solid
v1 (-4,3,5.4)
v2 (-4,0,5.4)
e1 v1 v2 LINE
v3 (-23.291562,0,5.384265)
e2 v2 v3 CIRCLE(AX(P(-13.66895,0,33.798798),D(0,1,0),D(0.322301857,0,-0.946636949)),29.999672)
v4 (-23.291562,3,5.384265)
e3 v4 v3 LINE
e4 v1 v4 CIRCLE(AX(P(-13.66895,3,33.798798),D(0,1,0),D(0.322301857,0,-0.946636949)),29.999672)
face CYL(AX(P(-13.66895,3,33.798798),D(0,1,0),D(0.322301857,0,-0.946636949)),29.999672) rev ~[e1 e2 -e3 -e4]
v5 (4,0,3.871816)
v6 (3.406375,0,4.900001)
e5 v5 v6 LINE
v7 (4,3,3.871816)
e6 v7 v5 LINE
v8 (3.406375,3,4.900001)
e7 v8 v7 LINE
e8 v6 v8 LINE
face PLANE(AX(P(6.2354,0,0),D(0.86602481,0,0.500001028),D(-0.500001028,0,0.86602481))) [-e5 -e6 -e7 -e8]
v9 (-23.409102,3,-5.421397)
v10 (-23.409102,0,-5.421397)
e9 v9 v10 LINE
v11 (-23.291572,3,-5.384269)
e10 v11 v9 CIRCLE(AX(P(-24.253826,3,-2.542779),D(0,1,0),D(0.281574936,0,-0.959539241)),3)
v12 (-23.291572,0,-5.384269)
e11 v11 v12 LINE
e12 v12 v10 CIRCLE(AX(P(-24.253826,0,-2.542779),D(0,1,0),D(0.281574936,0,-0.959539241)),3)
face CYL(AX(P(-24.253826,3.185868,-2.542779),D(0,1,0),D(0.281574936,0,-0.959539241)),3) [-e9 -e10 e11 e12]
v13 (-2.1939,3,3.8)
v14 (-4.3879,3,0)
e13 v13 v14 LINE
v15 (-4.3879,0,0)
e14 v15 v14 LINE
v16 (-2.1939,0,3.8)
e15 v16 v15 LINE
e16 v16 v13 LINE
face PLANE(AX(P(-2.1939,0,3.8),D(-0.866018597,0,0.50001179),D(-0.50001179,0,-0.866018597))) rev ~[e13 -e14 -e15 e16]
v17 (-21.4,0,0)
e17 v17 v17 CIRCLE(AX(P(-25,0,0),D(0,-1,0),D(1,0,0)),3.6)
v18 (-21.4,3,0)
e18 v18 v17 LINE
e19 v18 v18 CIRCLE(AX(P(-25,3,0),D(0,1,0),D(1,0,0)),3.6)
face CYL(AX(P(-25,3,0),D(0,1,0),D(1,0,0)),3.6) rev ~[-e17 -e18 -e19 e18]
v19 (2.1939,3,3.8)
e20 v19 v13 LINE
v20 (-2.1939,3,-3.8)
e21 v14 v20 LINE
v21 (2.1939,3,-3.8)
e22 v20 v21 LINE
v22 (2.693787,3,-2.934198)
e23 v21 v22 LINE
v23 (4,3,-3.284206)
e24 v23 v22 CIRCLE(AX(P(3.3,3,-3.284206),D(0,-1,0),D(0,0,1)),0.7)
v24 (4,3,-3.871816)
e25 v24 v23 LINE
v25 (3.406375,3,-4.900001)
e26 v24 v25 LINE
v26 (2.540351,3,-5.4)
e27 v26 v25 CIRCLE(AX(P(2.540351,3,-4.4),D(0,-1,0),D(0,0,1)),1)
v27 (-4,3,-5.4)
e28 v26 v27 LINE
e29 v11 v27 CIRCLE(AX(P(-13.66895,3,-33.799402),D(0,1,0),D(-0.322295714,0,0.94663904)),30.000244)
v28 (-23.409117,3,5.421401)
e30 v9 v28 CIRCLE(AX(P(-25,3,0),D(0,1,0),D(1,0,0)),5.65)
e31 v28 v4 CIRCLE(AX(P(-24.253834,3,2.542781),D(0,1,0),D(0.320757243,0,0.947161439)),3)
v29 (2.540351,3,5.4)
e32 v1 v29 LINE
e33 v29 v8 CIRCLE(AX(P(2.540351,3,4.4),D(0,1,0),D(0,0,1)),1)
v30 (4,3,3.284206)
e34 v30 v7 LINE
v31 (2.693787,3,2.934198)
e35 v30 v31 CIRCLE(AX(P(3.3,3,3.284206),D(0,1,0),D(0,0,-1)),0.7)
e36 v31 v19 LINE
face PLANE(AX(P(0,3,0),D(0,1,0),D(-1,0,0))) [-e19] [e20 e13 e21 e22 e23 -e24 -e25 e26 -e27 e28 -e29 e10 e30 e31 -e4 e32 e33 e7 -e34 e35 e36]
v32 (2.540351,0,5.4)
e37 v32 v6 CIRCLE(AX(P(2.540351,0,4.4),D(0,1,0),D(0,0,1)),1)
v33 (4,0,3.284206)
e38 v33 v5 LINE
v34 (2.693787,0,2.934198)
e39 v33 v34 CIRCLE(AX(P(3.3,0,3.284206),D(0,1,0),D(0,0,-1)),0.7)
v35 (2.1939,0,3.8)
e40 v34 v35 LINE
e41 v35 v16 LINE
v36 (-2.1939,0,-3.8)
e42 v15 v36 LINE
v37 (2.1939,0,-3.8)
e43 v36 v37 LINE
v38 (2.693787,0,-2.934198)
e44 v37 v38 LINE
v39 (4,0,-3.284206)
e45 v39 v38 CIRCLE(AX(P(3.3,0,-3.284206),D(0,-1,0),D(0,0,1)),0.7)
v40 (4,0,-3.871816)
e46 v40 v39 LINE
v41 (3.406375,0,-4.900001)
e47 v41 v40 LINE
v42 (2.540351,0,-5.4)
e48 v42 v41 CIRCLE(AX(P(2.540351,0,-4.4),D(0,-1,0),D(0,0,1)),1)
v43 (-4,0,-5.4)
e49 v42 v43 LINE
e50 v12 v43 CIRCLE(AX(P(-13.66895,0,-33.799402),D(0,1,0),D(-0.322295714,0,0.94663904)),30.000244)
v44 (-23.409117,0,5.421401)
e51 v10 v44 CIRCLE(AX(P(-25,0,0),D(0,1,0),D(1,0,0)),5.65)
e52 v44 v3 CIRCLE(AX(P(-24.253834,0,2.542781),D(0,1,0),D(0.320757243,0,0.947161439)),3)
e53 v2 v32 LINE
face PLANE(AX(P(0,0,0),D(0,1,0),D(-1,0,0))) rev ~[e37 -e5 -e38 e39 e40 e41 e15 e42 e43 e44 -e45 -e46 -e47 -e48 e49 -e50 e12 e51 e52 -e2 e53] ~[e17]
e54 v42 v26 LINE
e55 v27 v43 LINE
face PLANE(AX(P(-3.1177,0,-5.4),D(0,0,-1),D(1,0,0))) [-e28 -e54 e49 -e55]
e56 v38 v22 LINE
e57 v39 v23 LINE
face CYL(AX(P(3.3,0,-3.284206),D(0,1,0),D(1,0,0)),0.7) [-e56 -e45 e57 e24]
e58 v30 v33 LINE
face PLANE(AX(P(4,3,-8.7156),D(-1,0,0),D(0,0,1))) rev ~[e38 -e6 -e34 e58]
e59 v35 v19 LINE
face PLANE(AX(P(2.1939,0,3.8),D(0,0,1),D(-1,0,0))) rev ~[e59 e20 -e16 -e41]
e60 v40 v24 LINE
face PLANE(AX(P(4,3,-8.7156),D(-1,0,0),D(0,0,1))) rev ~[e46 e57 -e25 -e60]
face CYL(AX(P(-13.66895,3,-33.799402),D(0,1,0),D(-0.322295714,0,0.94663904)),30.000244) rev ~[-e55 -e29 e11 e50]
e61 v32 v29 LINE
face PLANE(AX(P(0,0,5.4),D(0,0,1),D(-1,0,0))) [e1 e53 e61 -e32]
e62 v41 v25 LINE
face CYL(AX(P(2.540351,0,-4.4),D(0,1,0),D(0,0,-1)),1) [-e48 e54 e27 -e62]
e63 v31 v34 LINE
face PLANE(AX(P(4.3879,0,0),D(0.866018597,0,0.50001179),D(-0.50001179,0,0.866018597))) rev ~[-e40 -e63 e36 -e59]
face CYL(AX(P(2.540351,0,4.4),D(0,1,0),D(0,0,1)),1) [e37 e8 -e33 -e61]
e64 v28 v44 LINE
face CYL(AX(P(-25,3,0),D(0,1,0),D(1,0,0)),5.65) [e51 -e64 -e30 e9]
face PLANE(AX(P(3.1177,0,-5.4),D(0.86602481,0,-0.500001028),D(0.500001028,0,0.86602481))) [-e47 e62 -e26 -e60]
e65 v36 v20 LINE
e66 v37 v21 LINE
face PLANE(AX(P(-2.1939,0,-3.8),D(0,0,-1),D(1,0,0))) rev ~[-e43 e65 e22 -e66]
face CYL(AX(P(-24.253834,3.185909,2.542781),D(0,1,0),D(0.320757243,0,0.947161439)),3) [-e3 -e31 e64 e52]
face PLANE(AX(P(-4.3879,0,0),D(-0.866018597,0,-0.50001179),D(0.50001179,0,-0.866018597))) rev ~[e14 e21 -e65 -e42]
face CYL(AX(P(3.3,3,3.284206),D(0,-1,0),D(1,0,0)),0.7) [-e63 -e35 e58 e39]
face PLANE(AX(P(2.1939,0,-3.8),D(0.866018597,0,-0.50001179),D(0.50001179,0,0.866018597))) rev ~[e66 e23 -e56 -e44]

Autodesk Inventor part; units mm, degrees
ref_plane "YZ Plane" through (0, 0, 0) normal (1, 0, 0) x (0, 1, 0)
ref_plane "XZ Plane" through (0, 0, 0) normal (0, 1, 0) x (-1, 0, 0)
ref_plane "XY Plane" through (0, 0, 0) normal (0, 0, 1) x (1, 0, 0)
sketch "Boceto1" plane through (0, 0, 0) normal (0, 1, 0) x (-1, 0, 0)
  line L0 (6.2354, 0) -> (3.1177, -5.4)
  line L1 (3.1177, -5.4) -> (-3.1177, -5.4)
  line L2 (-3.1177, -5.4) -> (-6.2354, 0)
  line L3 (-6.2354, 0) -> (-3.1177, 5.4)
  line L4 (-3.1177, 5.4) -> (3.1177, 5.4)
  line L5 (3.1177, 5.4) -> (6.2354, 0)
  circle A0 centre (0, 0) radius 5.4
  line L6 (4.3879, 0) -> (2.1939, -3.8)
  line L7 (2.1939, -3.8) -> (-2.1939, -3.8)
  line L8 (-2.1939, -3.8) -> (-4.3879, 0)
  line L9 (-4.3879, 0) -> (-2.1939, 3.8)
  line L10 (-2.1939, 3.8) -> (2.1939, 3.8)
  line L11 (2.1939, 3.8) -> (4.3879, 0)
  dimension "d0" = 10.8
  dimension "d4" = 1.6
extrude "Extrusión1" add sketch "Boceto1" along normal blind 3
sketch "Boceto2" plane through (0, 3, 0) normal (0, 1, 0) x (1, 0, 0)
  line L0 (8.9124, 8.7156) -> (4, 8.7156)
  line L1 (4, 8.7156) -> (4, -10.3861)
  line L2 (4, -10.3861) -> (8.9124, -10.3861)
  line L3 (8.9124, -10.3861) -> (8.9124, 8.7156)
  point P0 (0, 0)
  dimension "d22" = 4
extrude "Extrusión2" cut sketch "Boceto2" against normal through all
fillet "Empalme1" radius 1 4 edges at (3.1177, 1.5, -5.4) (3.1177, 1.5, 5.4) (-3.1177, 1.5, 5.4) (-3.1177, 1.5, -5.4)
fillet "Empalme2" radius 0.7 2 edges at (4, 1.5, -0.6718) (4, 1.5, 0.6718)
sketch "Boceto3" plane through (0, 3, 0) normal (0, 1, 0) x (1, 0, 0)
  line L0 (-23.3379, 5.4) -> (-4.3879, 5.4)
  line L1 (-4.3879, 5.4) -> (-4.3879, -5.4)
  line L2 (-4.3879, -5.4) -> (-23.3379, -5.4)
  line L3 (-23.3379, -5.4) -> (-23.3379, 5.4)
  line L4 (-23.3379, 5.4) -> (-4.3879, -5.4) construction
  line L5 (-4.3879, 5.4) -> (-23.3379, -5.4) construction
  line L6 (2.6938, -2.9342) -> (2.1939, -3.8) projected
  line L7 (2.1939, -3.8) -> (-2.1939, -3.8) projected
  line L8 (-2.1939, -3.8) -> (-4.3879, 0) projected
  line L9 (-4.3879, 0) -> (-2.1939, 3.8) projected
  line L10 (-2.1939, 3.8) -> (2.1939, 3.8) projected
  line L11 (2.1939, 3.8) -> (2.6938, 2.9342) projected
  arc A0 (3.4064, 4.9) -> (2.5403, 5.4) centre (2.5403, 4.4) ccw projected
  line L12 (2.5403, 5.4) -> (-2.5403, 5.4) projected
  arc A1 (-2.5403, 5.4) -> (-3.4064, 4.9) centre (-2.5403, 4.4) ccw projected
  line L13 (-3.4064, 4.9) -> (-6.2354, 0) projected
  line L14 (-6.2354, 0) -> (-3.4064, -4.9) projected
  arc A2 (-3.4064, -4.9) -> (-2.5403, -5.4) centre (-2.5403, -4.4) ccw projected
  line L15 (-2.5403, -5.4) -> (2.5403, -5.4) projected
  arc A3 (2.5403, -5.4) -> (3.4064, -4.9) centre (2.5403, -4.4) ccw projected
  line L16 (-4.3879, 5.4) -> (-0.8083, 5.4)
  line L17 (-0.8083, 5.4) -> (-0.8083, -5.4)
  line L18 (-0.8083, -5.4) -> (-4.3879, -5.4)
  line L19 (-4.3879, -5.4) -> (-4.3879, 5.4)
  circle A4 centre (-25, 0) radius 3.6
  circle A5 centre (-25, 0) radius 5.65
  line L20 (3.4064, -4.9) -> (4, -3.8718) projected
  line L21 (4, 3.8718) -> (3.4064, 4.9) projected
  line L22 (4, -3.8718) -> (4, -3.2842) projected
  line L23 (4, 3.2842) -> (4, 3.8718) projected
  arc A6 (4, -3.2842) -> (2.6938, -2.9342) centre (3.3, -3.2842) ccw projected
  arc A7 (2.6938, 2.9342) -> (4, 3.2842) centre (3.3, 3.2842) ccw projected
  point P0 (0, 0)
  point P1 (-13.8629, 0)
  point P2 (-13.8629, 0)
  point P3 (-13.8629, 0)
  point P4 (-2.5403, -5.4)
  point P5 (-2.5403, 5.4)
  point P6 (-23.3379, 5.4)
  point P7 (-2.8868, 4)
  point P8 (-4.3879, 3.2)
  point P9 (-4.3879, -3.2)
  point P10 (-23.3379, 5.4)
  point P11 (-0.8083, -3.8)
  point P12 (-0.8083, 3.8)
  point P13 (-0.8083, 5.4)
  dimension "d12" = 11.3
  dimension "d10" = 25
  dimension "d11" = 7.2
extrude "Extrusión3" add sketch "Boceto3" against normal up to surface (3 mm away) contours A5 L3 A4 | L0 L1 L13 L14 L2 A5 | L3 A4 A5 | L16 A1 L13 L1 | L1 L14 A2 L18
sketch "Boceto4" plane through (0, 3, 0) normal (0, 1, 0) x (1, 0, 0)
  arc A0 (-23.3379, 5.4) -> (-4, 5.4) centre (-13.669, 33.7991) ccw
  line L0 (-23.3379, -5.4) -> (2.5403, -5.4) projected
  arc A1 (-4, -5.4) -> (-23.3379, -5.4) centre (-13.669, -33.7991) ccw
  circle A2 centre (-25, 0) radius 3.6 projected
  line L1 (2.6938, -2.9342) -> (2.1939, -3.8) projected
  line L2 (2.1939, -3.8) -> (-2.1939, -3.8) projected
  line L3 (-2.1939, -3.8) -> (-4.3879, 0) projected
  line L4 (-4.3879, 0) -> (-2.1939, 3.8) projected
  line L5 (-2.1939, 3.8) -> (2.1939, 3.8) projected
  line L6 (2.1939, 3.8) -> (2.6938, 2.9342) projected
  arc A3 (3.4064, 4.9) -> (2.5403, 5.4) centre (2.5403, 4.4) ccw projected
  line L7 (2.5403, 5.4) -> (-23.3379, 5.4) projected
  arc A4 (-23.3379, 5.4) -> (-23.3379, -5.4) centre (-25, 0) ccw projected
  line L8 (-23.3379, -5.4) -> (2.5403, -5.4) projected
  arc A5 (2.5403, -5.4) -> (3.4064, -4.9) centre (2.5403, -4.4) ccw projected
  line L9 (3.4064, -4.9) -> (4, -3.8718) projected
  line L10 (4, 3.8718) -> (3.4064, 4.9) projected
  line L11 (4, 3.2842) -> (4, 3.8718) projected
  line L12 (4, -3.8718) -> (4, -3.2842) projected
  arc A6 (4, -3.2842) -> (2.6938, -2.9342) centre (3.3, -3.2842) ccw projected
  arc A7 (2.6938, 2.9342) -> (4, 3.2842) centre (3.3, 3.2842) ccw projected
  line L13 (2.5403, 5.4) -> (-23.3379, 5.4) projected
  point P0 (0, 0)
  point P1 (-4, 5.4)
  dimension "d16" = 4
  dimension "d18" = 30
extrude "Extrusión4" cut sketch "Boceto4" against normal through all contours L7 A0 | A1 L0
fillet "Empalme4" radius 3 2 edges at (-23.3379, 1.5, -5.4) (-23.3379, 1.5, 5.4)
properties part number "ShortLink"
